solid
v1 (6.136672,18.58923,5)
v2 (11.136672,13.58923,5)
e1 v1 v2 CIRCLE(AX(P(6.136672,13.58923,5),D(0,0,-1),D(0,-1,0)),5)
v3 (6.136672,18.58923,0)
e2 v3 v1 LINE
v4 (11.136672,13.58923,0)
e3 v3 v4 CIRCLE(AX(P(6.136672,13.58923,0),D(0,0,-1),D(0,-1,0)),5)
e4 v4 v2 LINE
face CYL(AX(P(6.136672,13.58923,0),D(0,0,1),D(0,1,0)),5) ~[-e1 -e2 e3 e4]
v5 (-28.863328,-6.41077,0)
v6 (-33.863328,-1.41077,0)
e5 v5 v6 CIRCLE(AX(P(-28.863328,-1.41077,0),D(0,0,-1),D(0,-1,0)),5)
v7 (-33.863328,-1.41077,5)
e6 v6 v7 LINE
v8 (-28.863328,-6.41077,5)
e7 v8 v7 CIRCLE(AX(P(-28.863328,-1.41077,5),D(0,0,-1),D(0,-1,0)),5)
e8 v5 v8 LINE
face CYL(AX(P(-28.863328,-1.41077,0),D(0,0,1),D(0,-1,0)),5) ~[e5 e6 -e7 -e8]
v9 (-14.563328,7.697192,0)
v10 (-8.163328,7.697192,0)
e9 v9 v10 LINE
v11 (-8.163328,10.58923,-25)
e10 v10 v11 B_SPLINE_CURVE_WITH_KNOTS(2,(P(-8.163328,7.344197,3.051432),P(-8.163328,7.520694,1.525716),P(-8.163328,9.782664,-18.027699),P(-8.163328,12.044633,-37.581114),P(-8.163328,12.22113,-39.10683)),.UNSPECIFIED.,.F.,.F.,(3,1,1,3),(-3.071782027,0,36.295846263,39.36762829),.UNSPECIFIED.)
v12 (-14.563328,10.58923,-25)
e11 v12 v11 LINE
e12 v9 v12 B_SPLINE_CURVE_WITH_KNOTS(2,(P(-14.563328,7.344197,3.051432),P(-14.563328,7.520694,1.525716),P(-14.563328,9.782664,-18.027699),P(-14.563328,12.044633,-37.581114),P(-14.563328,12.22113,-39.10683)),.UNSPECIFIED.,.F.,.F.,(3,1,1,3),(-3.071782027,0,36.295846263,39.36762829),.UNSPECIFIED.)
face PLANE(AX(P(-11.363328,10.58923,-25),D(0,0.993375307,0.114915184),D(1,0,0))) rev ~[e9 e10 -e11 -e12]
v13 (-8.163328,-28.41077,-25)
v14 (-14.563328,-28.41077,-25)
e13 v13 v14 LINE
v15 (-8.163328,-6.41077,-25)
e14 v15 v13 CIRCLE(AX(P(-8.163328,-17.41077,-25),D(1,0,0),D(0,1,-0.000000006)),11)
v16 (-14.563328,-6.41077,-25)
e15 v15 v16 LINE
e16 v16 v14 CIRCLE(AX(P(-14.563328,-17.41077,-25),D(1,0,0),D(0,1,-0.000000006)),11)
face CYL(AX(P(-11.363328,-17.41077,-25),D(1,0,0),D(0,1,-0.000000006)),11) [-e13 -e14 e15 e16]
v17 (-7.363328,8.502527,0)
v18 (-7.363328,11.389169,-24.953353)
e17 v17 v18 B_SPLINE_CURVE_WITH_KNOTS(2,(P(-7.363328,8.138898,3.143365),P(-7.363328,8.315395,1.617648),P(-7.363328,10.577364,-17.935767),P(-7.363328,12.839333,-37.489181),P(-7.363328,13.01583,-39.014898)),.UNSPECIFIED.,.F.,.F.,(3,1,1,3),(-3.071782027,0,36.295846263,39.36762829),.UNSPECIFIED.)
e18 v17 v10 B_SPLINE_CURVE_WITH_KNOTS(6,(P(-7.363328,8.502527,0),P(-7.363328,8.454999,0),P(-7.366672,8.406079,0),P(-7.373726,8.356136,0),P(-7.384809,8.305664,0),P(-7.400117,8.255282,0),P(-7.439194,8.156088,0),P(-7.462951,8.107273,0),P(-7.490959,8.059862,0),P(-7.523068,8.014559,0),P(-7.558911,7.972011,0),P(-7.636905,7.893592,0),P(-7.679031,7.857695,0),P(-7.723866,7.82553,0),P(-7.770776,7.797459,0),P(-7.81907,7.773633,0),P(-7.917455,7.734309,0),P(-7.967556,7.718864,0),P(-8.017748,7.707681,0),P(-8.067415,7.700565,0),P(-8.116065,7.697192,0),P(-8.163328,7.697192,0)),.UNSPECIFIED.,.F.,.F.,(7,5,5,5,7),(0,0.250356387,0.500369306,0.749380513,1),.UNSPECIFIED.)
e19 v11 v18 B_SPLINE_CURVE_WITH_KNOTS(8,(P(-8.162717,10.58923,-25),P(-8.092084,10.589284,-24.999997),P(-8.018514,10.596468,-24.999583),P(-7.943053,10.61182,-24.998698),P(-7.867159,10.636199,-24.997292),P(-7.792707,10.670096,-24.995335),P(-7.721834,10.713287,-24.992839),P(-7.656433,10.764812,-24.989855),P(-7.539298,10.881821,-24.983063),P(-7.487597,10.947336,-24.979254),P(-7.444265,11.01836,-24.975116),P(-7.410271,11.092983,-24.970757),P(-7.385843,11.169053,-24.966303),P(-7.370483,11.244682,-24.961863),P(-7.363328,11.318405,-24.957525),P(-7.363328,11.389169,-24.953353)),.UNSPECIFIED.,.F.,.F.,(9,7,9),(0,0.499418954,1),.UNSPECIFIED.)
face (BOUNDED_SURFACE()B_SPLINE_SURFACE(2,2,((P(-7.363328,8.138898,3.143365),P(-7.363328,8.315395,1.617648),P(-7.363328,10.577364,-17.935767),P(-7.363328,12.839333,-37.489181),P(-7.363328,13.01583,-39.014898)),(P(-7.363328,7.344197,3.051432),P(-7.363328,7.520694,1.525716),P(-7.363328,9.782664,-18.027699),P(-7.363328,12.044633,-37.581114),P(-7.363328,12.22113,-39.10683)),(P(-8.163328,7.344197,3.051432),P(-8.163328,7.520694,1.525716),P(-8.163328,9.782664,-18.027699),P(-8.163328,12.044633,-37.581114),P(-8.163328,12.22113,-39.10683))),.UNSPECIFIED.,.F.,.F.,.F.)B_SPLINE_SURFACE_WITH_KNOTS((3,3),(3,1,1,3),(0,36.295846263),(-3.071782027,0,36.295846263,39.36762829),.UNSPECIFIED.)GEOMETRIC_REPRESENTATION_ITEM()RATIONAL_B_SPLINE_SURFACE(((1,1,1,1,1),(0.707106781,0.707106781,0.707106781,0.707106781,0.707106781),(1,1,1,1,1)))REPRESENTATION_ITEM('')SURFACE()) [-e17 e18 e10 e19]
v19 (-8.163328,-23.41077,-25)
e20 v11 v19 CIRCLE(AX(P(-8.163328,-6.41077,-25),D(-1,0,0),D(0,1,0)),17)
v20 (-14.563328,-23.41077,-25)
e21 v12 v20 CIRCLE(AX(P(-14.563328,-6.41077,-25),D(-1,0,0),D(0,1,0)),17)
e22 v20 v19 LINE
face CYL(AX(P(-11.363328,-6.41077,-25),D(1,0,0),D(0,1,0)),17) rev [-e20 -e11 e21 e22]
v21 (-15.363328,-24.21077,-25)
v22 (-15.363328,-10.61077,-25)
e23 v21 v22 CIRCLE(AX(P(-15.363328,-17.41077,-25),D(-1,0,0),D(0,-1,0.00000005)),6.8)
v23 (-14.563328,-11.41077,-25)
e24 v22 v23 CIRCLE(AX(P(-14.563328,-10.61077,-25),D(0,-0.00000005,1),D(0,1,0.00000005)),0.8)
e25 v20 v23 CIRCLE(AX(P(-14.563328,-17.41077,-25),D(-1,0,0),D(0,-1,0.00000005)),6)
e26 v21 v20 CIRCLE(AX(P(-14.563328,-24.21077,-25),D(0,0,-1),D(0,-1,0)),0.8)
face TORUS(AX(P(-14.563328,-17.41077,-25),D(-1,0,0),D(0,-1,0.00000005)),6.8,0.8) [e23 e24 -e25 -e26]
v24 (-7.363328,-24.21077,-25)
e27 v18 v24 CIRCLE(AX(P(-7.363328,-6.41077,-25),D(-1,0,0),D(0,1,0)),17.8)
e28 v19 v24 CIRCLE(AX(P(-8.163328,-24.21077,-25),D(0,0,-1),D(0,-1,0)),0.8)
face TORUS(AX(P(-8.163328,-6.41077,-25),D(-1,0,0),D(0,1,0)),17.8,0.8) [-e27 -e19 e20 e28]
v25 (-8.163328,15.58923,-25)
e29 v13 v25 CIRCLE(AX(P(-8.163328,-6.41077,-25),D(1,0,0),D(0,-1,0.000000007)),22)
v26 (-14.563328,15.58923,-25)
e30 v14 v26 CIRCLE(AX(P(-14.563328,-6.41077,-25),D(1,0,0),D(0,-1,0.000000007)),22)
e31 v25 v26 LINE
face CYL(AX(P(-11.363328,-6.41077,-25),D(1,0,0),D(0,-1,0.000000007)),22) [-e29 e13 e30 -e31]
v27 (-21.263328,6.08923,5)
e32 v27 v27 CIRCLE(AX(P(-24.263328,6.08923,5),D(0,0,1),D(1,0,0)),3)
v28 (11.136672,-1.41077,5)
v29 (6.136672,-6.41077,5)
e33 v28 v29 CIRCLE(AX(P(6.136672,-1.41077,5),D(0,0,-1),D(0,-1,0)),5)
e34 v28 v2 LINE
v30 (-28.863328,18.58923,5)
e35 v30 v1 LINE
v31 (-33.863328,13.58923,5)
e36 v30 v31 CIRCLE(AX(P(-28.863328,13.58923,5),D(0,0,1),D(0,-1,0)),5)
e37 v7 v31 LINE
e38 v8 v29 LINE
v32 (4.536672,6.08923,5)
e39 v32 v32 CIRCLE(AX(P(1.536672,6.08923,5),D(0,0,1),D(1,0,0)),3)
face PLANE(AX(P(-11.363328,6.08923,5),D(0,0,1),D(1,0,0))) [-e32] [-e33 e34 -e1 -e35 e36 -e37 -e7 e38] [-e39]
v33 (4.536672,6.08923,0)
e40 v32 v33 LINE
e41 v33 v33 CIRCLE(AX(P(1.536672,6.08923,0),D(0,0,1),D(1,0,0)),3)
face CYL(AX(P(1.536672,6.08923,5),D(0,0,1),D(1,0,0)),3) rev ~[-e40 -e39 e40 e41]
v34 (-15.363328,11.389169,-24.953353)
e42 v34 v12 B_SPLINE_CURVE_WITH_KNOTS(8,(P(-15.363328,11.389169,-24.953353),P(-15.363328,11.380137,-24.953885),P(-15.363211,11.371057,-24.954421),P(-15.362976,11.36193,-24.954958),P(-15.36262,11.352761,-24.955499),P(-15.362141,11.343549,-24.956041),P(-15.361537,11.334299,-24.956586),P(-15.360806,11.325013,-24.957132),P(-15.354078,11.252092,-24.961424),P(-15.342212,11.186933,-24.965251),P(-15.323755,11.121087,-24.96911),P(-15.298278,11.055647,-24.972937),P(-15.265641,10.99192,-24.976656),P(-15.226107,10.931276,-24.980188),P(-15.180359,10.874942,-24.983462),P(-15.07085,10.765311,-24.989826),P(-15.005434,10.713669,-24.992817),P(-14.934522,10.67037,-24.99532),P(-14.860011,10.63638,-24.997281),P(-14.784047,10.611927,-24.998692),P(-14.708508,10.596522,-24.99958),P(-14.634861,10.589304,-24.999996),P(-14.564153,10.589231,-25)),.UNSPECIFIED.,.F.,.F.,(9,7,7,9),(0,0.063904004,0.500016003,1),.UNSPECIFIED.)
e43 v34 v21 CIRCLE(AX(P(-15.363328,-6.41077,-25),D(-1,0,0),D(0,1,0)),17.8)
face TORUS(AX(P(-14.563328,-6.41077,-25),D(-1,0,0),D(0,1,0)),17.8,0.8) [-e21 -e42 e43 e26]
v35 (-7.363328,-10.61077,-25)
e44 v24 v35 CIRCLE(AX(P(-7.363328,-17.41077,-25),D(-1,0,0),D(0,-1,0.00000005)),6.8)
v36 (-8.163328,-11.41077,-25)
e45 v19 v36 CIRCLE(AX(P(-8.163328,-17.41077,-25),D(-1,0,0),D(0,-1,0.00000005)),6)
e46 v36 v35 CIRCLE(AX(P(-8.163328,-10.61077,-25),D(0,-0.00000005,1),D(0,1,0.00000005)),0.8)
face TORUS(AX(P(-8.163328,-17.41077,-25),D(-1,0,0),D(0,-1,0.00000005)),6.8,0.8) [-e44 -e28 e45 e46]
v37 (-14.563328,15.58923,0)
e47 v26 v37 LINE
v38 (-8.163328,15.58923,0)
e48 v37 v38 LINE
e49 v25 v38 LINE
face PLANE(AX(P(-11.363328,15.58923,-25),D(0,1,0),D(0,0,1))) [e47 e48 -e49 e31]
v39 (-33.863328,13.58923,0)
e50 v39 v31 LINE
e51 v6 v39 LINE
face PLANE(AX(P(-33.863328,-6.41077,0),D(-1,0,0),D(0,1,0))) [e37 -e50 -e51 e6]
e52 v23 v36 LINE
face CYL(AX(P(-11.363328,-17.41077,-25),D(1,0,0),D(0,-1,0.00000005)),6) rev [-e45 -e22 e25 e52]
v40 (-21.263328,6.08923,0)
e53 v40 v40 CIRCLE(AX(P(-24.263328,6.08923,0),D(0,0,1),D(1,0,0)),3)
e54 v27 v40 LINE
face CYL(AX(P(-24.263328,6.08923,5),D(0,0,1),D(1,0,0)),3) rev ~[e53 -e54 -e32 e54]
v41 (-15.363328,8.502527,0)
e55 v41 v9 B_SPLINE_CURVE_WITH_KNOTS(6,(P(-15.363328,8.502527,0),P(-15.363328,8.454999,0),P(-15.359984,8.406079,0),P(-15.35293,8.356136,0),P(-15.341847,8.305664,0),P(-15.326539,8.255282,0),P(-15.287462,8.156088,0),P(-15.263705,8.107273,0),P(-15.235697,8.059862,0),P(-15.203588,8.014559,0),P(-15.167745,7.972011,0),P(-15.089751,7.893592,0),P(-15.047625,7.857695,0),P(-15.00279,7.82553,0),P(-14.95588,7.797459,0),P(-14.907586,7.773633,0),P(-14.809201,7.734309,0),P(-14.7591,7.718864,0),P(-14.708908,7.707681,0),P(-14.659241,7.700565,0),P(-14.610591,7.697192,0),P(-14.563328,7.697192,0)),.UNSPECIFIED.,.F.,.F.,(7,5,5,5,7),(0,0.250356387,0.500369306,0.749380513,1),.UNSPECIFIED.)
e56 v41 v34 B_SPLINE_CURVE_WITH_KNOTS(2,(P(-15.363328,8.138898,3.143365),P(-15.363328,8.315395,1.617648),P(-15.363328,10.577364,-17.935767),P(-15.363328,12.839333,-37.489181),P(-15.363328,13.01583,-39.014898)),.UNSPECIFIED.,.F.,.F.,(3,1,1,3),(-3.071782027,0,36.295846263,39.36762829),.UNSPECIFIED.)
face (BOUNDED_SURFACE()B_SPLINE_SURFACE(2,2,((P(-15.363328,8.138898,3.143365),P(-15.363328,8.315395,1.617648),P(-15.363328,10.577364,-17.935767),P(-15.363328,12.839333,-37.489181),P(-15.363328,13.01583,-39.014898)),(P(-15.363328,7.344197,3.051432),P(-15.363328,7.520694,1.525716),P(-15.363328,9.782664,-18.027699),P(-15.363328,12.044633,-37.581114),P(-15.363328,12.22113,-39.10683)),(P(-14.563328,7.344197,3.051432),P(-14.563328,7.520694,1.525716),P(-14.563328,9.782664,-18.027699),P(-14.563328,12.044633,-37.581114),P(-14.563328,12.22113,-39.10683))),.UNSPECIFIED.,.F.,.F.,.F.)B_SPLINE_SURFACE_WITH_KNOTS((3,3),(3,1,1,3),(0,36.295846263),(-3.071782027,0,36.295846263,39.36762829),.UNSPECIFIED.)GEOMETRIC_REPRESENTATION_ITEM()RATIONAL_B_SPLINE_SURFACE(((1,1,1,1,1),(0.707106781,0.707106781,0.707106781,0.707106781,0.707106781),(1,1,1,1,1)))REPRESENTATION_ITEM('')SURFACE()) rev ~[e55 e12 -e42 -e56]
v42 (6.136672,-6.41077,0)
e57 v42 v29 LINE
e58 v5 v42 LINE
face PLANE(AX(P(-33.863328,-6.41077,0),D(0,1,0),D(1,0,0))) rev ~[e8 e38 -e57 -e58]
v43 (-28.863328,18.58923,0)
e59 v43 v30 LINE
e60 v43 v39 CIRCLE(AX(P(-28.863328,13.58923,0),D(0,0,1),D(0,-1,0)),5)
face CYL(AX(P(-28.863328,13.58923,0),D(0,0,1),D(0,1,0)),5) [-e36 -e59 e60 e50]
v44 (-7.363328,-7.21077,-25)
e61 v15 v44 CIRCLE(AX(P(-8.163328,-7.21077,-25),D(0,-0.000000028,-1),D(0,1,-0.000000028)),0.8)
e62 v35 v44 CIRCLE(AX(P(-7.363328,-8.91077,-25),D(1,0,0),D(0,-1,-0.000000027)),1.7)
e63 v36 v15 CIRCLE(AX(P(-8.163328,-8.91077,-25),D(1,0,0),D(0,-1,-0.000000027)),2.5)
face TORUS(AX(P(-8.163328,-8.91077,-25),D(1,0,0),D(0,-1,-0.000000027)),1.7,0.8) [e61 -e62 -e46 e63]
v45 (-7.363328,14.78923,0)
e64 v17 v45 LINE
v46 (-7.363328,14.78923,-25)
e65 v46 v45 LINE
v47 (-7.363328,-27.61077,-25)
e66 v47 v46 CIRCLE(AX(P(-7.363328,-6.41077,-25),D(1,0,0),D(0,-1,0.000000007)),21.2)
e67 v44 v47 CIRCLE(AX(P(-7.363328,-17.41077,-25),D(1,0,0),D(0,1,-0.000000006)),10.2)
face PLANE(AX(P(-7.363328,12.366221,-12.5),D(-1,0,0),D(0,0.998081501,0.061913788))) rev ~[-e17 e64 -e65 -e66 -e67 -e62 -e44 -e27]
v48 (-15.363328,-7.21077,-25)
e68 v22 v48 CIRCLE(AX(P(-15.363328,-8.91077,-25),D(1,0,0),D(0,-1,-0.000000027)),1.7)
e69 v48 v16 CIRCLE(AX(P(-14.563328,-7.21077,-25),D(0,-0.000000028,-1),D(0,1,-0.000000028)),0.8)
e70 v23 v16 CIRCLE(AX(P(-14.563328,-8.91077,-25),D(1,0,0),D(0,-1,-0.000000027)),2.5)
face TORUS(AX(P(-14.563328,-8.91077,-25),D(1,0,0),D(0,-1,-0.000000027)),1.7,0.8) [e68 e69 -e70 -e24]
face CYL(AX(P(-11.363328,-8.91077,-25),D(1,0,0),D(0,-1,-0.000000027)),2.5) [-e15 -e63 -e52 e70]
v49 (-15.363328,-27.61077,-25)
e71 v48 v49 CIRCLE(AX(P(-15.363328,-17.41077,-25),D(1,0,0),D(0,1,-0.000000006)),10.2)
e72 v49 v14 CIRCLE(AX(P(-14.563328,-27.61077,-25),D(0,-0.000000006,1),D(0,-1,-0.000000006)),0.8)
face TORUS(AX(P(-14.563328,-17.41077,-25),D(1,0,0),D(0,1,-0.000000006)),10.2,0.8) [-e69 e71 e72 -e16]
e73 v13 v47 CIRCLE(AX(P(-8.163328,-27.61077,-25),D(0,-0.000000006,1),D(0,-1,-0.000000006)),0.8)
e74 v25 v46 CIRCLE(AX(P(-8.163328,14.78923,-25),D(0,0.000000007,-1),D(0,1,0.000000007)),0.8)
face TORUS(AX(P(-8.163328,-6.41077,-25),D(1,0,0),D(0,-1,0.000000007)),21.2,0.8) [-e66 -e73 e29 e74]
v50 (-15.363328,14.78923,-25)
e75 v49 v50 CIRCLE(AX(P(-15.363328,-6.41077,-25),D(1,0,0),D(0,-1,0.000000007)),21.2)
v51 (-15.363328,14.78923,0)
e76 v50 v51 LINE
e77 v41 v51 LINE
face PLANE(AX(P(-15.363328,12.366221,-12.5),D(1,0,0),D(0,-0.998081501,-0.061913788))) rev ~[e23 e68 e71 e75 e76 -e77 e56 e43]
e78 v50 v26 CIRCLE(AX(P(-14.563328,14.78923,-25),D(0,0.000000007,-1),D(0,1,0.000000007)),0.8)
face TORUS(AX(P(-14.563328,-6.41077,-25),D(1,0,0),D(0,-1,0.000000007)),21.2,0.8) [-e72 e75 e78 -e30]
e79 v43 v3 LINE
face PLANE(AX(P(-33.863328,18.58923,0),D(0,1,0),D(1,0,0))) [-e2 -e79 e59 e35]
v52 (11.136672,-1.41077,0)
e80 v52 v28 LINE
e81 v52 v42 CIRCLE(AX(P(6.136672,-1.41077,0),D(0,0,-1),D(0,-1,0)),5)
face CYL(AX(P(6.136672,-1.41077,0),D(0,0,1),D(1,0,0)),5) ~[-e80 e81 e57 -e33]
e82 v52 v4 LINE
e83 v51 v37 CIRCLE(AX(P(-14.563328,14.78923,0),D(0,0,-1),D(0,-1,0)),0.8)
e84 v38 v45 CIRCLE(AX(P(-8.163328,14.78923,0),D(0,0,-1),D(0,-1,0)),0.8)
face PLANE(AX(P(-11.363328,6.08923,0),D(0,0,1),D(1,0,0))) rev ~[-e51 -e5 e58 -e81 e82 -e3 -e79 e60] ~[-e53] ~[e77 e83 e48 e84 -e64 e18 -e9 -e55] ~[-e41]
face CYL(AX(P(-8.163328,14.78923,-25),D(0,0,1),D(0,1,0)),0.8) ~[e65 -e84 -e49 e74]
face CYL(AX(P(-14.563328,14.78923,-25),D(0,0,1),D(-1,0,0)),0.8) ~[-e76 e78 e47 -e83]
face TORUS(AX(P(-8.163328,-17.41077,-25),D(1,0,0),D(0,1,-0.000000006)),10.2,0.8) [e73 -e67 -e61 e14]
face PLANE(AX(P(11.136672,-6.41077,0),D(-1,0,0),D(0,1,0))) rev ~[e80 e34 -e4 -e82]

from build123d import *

# Parameters (mm, degrees)
F0_W     = 45
F0_H     = 25
F1_DEPTH = 5
F2_R     = 3
F3_DEPTH = 25
F6_DEPTH = 4
F7_W     = 8
F7_H     = 7.8920384722
F9_W     = 8
F9_H     = 5
F11_R    = 5
F12_R    = 0.8


# Not quite as in the source:
# - ends of sketch curves that miss each other by under 0.0002 mm in the source are joined


with BuildPart() as f1:
    # F0 (on Top) → F1 (new body)
    with BuildSketch(Plane.XY):
        with Locations((-11.3633279689, 6.0892301559)):
            Rectangle(F0_W, F0_H)
    extrude(amount=F1_DEPTH)

    # F2 (on face) → F3 (cut)
    with BuildSketch(Plane.XY.offset(5)):
        with Locations((-24.2633279689, 6.0892301559)):
            Circle(F2_R)
        with Locations((1.5366720311, 6.0892301559)):
            Circle(F2_R)
    extrude(amount=-F3_DEPTH, mode=Mode.SUBTRACT)

    # F5 (on line) → F6 (join, symmetric)
    with BuildSketch(Plane.YZ.offset(-11.3633279689)):
        with BuildLine():
            Line((15.5892301559, -25), (15.5892301559, 0))
            Line((15.5892301559, 0), (10.5892301559, 0))
            Line((10.5892301559, 0), (10.5892301559, -25))
            ThreePointArc((10.5892301559, -25), (-6.4107698441, -42), (-23.4107698441, -25))
            ThreePointArc((-23.4107698441, -25), (-17.4107695142, -19.0000002749), (-11.4107697891, -25))
            ThreePointArc((-11.4107697891, -25), (-8.9107696516, -27.5), (-6.4107696516, -25))
            ThreePointArc((-6.4107696516, -25), (-17.4107695142, -14), (-28.4107695142, -25))
            ThreePointArc((-28.4107695142, -25), (-6.4107698441, -47), (15.5892301559, -25))
        make_face()
    extrude(amount=F6_DEPTH, both=True)

    # F7 (on face) → F10 section 0
    with BuildSketch(Plane.XY):
        with Locations((-11.3633279689, 11.6432109198)):
            Rectangle(F7_W, F7_H)
    # F9 (on face) → F10 section 1
    with BuildSketch(Plane.XY.offset(-25)):
        with Locations((-11.3633279689, 13.0892301559)):
            Rectangle(F9_W, F9_H)
    loft()

    # F11
    f11_edges = [f1.edges().sort_by_distance(p)[0] for p in [
        (-33.863328, 18.58923, 2.5),
        (-33.863328, -6.41077, 2.5),
        (11.136672, 18.58923, 2.5),
        (11.136672, -6.41077, 2.5),
    ]]
    fillet(f11_edges, radius=F11_R)

    # F12
    f12_edges = [f1.edges().sort_by_distance(p)[0] for p in [
        (-7.363328, 15.58923, -12.5),
        (-7.363328, -6.41077, -47),
        (-15.363328, 15.58923, -12.5),
        (-15.363328, -6.41077, -47),
        (-15.363328, 9.143211, -12.5),
        (-7.363328, 9.143211, -12.5),
    ]]
    fillet(f12_edges, radius=F12_R)


solid = f1.part
